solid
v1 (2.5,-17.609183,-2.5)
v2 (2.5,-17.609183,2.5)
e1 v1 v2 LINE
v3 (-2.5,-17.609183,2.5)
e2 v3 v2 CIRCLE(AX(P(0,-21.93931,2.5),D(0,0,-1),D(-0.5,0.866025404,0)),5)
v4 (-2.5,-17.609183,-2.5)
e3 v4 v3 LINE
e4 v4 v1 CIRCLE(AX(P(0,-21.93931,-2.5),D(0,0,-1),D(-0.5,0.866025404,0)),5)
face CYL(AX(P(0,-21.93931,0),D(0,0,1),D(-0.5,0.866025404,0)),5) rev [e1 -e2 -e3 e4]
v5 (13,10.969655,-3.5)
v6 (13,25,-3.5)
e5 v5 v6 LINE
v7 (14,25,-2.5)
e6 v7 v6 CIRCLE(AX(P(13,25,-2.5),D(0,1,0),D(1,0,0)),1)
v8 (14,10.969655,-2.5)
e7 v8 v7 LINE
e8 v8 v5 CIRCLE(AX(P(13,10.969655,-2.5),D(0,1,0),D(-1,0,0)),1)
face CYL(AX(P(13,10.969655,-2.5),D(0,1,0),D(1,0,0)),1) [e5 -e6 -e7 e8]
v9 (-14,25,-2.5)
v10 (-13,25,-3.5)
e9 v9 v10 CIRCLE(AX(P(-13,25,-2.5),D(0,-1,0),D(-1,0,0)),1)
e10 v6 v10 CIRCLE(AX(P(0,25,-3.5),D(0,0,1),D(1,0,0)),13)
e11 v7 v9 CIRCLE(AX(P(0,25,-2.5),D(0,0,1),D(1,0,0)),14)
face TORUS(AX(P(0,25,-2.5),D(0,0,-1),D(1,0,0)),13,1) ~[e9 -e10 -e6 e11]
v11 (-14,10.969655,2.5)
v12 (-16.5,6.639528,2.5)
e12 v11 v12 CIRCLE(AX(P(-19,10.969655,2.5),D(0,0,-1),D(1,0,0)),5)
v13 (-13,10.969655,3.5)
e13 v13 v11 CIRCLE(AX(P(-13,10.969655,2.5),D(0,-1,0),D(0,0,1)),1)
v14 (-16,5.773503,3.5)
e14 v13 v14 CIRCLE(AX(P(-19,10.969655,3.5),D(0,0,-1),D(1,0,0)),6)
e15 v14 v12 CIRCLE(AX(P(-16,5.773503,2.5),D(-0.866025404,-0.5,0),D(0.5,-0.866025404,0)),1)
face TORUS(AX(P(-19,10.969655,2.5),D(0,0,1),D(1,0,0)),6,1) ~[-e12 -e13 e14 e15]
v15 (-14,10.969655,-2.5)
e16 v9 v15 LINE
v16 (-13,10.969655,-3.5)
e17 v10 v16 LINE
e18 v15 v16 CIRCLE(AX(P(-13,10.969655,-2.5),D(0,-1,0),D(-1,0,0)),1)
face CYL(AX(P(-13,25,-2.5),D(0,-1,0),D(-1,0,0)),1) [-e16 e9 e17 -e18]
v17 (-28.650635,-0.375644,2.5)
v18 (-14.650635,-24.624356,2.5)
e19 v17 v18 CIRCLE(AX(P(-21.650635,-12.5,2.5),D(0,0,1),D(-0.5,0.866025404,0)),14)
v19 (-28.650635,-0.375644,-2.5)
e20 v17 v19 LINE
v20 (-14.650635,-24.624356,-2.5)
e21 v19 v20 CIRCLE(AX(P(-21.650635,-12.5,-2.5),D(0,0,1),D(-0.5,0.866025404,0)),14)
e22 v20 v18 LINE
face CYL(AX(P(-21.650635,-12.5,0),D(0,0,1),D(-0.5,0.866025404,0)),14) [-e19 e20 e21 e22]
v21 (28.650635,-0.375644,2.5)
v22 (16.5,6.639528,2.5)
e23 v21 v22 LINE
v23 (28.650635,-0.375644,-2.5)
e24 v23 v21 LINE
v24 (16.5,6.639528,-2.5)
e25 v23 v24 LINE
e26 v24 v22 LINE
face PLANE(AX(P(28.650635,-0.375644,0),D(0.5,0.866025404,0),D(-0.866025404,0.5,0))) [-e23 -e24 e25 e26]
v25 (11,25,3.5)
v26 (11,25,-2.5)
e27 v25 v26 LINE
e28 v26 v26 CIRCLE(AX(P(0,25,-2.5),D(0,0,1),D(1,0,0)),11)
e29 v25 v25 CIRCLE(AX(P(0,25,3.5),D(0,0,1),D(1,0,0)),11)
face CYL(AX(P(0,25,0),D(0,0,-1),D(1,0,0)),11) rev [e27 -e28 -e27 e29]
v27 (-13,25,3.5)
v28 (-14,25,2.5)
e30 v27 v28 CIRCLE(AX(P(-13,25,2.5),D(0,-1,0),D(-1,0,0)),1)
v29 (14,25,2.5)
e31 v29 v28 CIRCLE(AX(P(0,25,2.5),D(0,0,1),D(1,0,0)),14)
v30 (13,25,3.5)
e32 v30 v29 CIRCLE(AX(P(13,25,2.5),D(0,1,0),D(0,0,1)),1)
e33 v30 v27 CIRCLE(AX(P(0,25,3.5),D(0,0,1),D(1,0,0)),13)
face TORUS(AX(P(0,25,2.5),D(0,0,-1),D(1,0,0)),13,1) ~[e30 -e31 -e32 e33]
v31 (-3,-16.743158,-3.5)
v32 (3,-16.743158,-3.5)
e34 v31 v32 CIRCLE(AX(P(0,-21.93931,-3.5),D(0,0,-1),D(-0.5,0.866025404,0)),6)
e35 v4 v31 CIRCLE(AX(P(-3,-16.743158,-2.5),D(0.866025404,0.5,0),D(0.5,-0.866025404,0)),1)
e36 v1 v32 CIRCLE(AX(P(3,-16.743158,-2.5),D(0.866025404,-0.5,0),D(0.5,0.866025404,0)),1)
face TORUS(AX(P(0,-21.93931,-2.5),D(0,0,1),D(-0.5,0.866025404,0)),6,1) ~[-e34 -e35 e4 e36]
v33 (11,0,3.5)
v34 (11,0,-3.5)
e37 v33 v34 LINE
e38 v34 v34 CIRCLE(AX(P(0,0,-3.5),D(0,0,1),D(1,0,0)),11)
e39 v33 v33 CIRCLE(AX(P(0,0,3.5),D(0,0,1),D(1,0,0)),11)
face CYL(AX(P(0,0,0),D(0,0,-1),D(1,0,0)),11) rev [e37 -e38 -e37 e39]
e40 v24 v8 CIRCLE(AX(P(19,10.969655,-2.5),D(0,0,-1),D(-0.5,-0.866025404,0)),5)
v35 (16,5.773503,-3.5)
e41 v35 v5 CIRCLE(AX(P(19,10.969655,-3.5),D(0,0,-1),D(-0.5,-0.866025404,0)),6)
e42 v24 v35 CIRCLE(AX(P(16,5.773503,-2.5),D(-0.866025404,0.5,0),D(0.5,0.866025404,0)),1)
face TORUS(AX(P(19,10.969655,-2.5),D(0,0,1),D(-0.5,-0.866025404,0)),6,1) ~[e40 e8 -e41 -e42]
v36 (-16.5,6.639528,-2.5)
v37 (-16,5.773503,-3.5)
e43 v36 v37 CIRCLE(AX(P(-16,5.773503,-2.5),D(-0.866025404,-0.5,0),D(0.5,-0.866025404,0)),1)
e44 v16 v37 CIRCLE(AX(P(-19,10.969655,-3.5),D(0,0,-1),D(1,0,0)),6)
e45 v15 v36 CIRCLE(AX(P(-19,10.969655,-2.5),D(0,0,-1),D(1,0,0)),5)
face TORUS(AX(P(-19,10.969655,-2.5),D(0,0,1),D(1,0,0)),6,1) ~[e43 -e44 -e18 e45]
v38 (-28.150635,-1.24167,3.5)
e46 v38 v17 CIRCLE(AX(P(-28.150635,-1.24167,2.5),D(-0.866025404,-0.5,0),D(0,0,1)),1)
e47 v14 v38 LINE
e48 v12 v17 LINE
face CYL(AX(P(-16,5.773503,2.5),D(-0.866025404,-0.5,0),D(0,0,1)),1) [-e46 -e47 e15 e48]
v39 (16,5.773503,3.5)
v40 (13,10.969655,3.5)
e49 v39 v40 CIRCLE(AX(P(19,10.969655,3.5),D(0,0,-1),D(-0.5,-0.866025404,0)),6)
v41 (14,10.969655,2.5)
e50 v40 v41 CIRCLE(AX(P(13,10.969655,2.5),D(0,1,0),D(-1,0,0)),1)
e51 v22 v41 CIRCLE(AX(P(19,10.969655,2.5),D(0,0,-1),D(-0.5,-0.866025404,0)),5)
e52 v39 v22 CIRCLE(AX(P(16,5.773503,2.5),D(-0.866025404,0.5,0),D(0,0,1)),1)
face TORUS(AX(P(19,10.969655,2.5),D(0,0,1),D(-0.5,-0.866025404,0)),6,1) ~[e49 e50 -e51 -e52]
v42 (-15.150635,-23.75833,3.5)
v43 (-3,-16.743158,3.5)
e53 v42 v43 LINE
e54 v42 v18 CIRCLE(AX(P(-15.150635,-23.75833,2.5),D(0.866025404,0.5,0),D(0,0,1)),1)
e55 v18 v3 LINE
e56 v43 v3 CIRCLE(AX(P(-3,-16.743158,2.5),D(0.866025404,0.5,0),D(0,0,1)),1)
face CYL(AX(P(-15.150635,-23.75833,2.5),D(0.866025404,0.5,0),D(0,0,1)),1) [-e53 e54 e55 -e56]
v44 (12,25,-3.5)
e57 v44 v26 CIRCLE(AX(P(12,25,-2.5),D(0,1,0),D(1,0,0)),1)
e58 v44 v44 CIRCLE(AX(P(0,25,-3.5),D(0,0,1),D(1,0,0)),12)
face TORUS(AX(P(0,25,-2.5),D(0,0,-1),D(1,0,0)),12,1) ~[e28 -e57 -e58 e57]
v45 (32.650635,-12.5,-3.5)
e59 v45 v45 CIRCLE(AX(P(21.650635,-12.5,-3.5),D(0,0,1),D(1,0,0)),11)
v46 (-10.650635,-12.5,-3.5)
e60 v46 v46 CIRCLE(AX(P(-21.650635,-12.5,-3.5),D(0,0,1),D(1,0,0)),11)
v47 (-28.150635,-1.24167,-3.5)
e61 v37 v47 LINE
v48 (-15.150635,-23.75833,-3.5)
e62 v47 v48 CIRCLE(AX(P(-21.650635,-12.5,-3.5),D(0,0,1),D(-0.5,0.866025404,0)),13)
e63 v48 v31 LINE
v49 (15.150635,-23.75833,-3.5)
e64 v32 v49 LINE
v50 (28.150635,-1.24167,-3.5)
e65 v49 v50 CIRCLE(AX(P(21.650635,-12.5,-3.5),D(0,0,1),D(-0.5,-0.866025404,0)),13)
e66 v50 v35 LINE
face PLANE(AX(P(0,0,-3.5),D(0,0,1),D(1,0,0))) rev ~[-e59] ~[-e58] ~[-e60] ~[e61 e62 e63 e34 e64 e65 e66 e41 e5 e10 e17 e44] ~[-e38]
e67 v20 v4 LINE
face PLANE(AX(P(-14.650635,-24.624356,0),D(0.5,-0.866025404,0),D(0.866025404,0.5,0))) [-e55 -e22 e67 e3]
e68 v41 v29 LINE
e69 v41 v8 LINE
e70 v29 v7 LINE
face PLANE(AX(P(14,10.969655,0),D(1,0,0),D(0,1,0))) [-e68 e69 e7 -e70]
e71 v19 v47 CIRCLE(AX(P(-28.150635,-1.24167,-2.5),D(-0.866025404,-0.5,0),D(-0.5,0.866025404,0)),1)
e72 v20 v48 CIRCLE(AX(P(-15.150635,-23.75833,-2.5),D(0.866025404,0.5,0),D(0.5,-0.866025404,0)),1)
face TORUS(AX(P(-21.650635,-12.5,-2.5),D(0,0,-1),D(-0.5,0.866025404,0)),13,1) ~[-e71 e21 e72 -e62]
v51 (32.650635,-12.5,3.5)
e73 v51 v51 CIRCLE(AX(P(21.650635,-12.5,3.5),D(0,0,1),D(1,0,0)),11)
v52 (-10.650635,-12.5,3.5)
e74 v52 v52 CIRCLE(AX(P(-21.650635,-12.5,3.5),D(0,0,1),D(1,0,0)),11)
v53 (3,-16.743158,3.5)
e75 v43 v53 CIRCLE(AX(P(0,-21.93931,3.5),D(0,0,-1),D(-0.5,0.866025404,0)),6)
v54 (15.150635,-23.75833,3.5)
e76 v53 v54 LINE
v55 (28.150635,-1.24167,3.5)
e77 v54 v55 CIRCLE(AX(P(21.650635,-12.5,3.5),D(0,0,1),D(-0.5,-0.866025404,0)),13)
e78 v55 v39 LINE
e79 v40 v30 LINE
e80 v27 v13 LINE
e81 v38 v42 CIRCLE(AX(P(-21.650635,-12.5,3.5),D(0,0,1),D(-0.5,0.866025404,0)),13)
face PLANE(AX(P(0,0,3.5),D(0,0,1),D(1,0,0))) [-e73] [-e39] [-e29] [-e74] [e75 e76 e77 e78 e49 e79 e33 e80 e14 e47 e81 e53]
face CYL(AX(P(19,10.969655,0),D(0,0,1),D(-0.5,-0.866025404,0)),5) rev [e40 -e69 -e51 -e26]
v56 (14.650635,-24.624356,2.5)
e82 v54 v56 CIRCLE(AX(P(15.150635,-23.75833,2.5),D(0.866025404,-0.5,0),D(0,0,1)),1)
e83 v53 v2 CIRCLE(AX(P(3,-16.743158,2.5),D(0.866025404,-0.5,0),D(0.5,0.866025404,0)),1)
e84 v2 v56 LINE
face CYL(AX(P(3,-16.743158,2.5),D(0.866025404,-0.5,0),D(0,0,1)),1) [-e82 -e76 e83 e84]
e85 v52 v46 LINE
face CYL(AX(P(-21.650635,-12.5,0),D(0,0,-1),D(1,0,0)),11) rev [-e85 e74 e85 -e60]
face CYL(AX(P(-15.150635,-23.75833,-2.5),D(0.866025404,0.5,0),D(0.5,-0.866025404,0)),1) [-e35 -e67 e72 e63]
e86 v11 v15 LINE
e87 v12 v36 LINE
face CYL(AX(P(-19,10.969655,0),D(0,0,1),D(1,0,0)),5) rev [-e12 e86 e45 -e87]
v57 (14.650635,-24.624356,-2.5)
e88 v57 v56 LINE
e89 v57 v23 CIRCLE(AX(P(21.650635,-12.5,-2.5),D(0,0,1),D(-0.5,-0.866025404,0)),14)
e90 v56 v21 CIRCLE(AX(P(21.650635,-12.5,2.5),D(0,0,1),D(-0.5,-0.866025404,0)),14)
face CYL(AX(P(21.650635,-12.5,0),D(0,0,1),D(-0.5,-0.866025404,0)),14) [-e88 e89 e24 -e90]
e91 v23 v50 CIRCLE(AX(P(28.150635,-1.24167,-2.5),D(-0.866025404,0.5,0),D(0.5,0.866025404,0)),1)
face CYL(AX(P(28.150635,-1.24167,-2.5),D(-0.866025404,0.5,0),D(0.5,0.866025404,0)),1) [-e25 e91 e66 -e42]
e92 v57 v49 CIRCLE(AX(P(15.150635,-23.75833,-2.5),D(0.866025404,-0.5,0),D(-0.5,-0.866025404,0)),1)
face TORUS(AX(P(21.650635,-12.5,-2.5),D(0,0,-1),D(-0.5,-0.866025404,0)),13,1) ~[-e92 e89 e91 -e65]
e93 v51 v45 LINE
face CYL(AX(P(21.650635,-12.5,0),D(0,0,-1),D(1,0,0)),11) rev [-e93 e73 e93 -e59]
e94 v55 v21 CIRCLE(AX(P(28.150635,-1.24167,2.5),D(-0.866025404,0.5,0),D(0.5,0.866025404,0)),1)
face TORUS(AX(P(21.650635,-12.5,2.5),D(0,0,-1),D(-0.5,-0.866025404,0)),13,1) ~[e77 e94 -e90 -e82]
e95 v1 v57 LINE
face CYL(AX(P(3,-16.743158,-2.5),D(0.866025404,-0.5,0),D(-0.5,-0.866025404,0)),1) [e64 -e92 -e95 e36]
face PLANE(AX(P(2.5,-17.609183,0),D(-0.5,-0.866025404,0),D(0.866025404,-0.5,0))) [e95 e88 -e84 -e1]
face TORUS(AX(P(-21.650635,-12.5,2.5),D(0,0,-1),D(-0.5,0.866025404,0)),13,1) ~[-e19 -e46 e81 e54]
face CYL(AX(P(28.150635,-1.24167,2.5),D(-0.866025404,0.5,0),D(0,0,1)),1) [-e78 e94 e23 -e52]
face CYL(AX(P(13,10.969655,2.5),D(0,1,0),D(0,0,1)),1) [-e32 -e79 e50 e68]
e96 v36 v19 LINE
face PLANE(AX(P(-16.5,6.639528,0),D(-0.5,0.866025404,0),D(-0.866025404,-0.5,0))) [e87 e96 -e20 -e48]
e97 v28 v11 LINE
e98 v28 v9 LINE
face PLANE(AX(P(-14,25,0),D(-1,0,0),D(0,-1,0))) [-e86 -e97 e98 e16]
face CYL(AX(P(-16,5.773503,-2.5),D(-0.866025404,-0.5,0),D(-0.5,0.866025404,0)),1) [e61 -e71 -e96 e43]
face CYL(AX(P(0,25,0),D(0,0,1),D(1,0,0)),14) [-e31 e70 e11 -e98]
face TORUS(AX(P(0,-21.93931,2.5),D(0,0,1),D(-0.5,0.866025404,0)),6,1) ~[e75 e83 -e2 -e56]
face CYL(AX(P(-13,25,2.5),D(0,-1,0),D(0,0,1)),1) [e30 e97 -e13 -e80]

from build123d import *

# Parameters (mm, degrees)
F0_R     = 11
F1_DEPTH = 3.5
F2_R     = 1
F3_R     = 1


# Not quite as in the source:
# - a feature names something its author has since deleted; it is built from what else it names


with BuildPart() as f1:
    # F0 (on Top) → F1 (new body, symmetric)
    with BuildSketch(Plane.XY):
        with BuildLine():
            ThreePointArc((-28.6506350946, -0.375644347), (-33.7749907476, -19.5), (-14.6506350946, -24.624355653))
            Line((-14.6506350946, -24.624355653), (-2.5, -17.6091832103))
            ThreePointArc((-2.5, -17.6091832103), (0, -16.9393102292), (2.5, -17.6091832103))
            Line((2.5, -17.6091832103), (14.6506350946, -24.624355653))
            ThreePointArc((14.6506350946, -24.624355653), (33.7749907476, -19.5), (28.6506350946, -0.375644347))
            Line((28.6506350946, -0.375644347), (16.5, 6.6395280957))
            ThreePointArc((16.5, 6.6395280957), (14.6698729811, 8.4696551146), (14, 10.9696551146))
            Line((14, 10.9696551146), (14, 25))
            ThreePointArc((14, 25), (0, 39), (-14, 25))
            Line((-14, 25), (-14, 10.9696551146))
            ThreePointArc((-14, 10.9696551146), (-14.6698729811, 8.4696551146), (-16.5, 6.6395280957))
            Line((-16.5, 6.6395280957), (-28.6506350946, -0.375644347))
        make_face()
        with Locations((-21.6506350946, -12.5)):
            Circle(F0_R, mode=Mode.SUBTRACT)
        with Locations((21.6506350946, -12.5)):
            Circle(F0_R, mode=Mode.SUBTRACT)
        Circle(F0_R, mode=Mode.SUBTRACT)
        with Locations((0, 25)):
            Circle(F0_R, mode=Mode.SUBTRACT)
    extrude(amount=F1_DEPTH, both=True)

    # F2
    f2_edges = [f1.edges().sort_by_distance(p)[0] for p in [
        (-8.575318, -21.116769, 3.5),
        (-33.774991, -19.5, 3.5),
        (-22.575318, 3.131942, 3.5),
    ]]
    fillet(f2_edges, radius=F2_R)

    # F3
    f3_edges = [f1.edges().sort_by_distance(p)[0] for p in [
        (-8.575318, -21.116769, -3.5),
        (-33.774991, -19.5, -3.5),
        (-22.575318, 3.131942, -3.5),
        (-11, 25, -3.5),
    ]]
    fillet(f3_edges, radius=F3_R)


solid = f1.part
